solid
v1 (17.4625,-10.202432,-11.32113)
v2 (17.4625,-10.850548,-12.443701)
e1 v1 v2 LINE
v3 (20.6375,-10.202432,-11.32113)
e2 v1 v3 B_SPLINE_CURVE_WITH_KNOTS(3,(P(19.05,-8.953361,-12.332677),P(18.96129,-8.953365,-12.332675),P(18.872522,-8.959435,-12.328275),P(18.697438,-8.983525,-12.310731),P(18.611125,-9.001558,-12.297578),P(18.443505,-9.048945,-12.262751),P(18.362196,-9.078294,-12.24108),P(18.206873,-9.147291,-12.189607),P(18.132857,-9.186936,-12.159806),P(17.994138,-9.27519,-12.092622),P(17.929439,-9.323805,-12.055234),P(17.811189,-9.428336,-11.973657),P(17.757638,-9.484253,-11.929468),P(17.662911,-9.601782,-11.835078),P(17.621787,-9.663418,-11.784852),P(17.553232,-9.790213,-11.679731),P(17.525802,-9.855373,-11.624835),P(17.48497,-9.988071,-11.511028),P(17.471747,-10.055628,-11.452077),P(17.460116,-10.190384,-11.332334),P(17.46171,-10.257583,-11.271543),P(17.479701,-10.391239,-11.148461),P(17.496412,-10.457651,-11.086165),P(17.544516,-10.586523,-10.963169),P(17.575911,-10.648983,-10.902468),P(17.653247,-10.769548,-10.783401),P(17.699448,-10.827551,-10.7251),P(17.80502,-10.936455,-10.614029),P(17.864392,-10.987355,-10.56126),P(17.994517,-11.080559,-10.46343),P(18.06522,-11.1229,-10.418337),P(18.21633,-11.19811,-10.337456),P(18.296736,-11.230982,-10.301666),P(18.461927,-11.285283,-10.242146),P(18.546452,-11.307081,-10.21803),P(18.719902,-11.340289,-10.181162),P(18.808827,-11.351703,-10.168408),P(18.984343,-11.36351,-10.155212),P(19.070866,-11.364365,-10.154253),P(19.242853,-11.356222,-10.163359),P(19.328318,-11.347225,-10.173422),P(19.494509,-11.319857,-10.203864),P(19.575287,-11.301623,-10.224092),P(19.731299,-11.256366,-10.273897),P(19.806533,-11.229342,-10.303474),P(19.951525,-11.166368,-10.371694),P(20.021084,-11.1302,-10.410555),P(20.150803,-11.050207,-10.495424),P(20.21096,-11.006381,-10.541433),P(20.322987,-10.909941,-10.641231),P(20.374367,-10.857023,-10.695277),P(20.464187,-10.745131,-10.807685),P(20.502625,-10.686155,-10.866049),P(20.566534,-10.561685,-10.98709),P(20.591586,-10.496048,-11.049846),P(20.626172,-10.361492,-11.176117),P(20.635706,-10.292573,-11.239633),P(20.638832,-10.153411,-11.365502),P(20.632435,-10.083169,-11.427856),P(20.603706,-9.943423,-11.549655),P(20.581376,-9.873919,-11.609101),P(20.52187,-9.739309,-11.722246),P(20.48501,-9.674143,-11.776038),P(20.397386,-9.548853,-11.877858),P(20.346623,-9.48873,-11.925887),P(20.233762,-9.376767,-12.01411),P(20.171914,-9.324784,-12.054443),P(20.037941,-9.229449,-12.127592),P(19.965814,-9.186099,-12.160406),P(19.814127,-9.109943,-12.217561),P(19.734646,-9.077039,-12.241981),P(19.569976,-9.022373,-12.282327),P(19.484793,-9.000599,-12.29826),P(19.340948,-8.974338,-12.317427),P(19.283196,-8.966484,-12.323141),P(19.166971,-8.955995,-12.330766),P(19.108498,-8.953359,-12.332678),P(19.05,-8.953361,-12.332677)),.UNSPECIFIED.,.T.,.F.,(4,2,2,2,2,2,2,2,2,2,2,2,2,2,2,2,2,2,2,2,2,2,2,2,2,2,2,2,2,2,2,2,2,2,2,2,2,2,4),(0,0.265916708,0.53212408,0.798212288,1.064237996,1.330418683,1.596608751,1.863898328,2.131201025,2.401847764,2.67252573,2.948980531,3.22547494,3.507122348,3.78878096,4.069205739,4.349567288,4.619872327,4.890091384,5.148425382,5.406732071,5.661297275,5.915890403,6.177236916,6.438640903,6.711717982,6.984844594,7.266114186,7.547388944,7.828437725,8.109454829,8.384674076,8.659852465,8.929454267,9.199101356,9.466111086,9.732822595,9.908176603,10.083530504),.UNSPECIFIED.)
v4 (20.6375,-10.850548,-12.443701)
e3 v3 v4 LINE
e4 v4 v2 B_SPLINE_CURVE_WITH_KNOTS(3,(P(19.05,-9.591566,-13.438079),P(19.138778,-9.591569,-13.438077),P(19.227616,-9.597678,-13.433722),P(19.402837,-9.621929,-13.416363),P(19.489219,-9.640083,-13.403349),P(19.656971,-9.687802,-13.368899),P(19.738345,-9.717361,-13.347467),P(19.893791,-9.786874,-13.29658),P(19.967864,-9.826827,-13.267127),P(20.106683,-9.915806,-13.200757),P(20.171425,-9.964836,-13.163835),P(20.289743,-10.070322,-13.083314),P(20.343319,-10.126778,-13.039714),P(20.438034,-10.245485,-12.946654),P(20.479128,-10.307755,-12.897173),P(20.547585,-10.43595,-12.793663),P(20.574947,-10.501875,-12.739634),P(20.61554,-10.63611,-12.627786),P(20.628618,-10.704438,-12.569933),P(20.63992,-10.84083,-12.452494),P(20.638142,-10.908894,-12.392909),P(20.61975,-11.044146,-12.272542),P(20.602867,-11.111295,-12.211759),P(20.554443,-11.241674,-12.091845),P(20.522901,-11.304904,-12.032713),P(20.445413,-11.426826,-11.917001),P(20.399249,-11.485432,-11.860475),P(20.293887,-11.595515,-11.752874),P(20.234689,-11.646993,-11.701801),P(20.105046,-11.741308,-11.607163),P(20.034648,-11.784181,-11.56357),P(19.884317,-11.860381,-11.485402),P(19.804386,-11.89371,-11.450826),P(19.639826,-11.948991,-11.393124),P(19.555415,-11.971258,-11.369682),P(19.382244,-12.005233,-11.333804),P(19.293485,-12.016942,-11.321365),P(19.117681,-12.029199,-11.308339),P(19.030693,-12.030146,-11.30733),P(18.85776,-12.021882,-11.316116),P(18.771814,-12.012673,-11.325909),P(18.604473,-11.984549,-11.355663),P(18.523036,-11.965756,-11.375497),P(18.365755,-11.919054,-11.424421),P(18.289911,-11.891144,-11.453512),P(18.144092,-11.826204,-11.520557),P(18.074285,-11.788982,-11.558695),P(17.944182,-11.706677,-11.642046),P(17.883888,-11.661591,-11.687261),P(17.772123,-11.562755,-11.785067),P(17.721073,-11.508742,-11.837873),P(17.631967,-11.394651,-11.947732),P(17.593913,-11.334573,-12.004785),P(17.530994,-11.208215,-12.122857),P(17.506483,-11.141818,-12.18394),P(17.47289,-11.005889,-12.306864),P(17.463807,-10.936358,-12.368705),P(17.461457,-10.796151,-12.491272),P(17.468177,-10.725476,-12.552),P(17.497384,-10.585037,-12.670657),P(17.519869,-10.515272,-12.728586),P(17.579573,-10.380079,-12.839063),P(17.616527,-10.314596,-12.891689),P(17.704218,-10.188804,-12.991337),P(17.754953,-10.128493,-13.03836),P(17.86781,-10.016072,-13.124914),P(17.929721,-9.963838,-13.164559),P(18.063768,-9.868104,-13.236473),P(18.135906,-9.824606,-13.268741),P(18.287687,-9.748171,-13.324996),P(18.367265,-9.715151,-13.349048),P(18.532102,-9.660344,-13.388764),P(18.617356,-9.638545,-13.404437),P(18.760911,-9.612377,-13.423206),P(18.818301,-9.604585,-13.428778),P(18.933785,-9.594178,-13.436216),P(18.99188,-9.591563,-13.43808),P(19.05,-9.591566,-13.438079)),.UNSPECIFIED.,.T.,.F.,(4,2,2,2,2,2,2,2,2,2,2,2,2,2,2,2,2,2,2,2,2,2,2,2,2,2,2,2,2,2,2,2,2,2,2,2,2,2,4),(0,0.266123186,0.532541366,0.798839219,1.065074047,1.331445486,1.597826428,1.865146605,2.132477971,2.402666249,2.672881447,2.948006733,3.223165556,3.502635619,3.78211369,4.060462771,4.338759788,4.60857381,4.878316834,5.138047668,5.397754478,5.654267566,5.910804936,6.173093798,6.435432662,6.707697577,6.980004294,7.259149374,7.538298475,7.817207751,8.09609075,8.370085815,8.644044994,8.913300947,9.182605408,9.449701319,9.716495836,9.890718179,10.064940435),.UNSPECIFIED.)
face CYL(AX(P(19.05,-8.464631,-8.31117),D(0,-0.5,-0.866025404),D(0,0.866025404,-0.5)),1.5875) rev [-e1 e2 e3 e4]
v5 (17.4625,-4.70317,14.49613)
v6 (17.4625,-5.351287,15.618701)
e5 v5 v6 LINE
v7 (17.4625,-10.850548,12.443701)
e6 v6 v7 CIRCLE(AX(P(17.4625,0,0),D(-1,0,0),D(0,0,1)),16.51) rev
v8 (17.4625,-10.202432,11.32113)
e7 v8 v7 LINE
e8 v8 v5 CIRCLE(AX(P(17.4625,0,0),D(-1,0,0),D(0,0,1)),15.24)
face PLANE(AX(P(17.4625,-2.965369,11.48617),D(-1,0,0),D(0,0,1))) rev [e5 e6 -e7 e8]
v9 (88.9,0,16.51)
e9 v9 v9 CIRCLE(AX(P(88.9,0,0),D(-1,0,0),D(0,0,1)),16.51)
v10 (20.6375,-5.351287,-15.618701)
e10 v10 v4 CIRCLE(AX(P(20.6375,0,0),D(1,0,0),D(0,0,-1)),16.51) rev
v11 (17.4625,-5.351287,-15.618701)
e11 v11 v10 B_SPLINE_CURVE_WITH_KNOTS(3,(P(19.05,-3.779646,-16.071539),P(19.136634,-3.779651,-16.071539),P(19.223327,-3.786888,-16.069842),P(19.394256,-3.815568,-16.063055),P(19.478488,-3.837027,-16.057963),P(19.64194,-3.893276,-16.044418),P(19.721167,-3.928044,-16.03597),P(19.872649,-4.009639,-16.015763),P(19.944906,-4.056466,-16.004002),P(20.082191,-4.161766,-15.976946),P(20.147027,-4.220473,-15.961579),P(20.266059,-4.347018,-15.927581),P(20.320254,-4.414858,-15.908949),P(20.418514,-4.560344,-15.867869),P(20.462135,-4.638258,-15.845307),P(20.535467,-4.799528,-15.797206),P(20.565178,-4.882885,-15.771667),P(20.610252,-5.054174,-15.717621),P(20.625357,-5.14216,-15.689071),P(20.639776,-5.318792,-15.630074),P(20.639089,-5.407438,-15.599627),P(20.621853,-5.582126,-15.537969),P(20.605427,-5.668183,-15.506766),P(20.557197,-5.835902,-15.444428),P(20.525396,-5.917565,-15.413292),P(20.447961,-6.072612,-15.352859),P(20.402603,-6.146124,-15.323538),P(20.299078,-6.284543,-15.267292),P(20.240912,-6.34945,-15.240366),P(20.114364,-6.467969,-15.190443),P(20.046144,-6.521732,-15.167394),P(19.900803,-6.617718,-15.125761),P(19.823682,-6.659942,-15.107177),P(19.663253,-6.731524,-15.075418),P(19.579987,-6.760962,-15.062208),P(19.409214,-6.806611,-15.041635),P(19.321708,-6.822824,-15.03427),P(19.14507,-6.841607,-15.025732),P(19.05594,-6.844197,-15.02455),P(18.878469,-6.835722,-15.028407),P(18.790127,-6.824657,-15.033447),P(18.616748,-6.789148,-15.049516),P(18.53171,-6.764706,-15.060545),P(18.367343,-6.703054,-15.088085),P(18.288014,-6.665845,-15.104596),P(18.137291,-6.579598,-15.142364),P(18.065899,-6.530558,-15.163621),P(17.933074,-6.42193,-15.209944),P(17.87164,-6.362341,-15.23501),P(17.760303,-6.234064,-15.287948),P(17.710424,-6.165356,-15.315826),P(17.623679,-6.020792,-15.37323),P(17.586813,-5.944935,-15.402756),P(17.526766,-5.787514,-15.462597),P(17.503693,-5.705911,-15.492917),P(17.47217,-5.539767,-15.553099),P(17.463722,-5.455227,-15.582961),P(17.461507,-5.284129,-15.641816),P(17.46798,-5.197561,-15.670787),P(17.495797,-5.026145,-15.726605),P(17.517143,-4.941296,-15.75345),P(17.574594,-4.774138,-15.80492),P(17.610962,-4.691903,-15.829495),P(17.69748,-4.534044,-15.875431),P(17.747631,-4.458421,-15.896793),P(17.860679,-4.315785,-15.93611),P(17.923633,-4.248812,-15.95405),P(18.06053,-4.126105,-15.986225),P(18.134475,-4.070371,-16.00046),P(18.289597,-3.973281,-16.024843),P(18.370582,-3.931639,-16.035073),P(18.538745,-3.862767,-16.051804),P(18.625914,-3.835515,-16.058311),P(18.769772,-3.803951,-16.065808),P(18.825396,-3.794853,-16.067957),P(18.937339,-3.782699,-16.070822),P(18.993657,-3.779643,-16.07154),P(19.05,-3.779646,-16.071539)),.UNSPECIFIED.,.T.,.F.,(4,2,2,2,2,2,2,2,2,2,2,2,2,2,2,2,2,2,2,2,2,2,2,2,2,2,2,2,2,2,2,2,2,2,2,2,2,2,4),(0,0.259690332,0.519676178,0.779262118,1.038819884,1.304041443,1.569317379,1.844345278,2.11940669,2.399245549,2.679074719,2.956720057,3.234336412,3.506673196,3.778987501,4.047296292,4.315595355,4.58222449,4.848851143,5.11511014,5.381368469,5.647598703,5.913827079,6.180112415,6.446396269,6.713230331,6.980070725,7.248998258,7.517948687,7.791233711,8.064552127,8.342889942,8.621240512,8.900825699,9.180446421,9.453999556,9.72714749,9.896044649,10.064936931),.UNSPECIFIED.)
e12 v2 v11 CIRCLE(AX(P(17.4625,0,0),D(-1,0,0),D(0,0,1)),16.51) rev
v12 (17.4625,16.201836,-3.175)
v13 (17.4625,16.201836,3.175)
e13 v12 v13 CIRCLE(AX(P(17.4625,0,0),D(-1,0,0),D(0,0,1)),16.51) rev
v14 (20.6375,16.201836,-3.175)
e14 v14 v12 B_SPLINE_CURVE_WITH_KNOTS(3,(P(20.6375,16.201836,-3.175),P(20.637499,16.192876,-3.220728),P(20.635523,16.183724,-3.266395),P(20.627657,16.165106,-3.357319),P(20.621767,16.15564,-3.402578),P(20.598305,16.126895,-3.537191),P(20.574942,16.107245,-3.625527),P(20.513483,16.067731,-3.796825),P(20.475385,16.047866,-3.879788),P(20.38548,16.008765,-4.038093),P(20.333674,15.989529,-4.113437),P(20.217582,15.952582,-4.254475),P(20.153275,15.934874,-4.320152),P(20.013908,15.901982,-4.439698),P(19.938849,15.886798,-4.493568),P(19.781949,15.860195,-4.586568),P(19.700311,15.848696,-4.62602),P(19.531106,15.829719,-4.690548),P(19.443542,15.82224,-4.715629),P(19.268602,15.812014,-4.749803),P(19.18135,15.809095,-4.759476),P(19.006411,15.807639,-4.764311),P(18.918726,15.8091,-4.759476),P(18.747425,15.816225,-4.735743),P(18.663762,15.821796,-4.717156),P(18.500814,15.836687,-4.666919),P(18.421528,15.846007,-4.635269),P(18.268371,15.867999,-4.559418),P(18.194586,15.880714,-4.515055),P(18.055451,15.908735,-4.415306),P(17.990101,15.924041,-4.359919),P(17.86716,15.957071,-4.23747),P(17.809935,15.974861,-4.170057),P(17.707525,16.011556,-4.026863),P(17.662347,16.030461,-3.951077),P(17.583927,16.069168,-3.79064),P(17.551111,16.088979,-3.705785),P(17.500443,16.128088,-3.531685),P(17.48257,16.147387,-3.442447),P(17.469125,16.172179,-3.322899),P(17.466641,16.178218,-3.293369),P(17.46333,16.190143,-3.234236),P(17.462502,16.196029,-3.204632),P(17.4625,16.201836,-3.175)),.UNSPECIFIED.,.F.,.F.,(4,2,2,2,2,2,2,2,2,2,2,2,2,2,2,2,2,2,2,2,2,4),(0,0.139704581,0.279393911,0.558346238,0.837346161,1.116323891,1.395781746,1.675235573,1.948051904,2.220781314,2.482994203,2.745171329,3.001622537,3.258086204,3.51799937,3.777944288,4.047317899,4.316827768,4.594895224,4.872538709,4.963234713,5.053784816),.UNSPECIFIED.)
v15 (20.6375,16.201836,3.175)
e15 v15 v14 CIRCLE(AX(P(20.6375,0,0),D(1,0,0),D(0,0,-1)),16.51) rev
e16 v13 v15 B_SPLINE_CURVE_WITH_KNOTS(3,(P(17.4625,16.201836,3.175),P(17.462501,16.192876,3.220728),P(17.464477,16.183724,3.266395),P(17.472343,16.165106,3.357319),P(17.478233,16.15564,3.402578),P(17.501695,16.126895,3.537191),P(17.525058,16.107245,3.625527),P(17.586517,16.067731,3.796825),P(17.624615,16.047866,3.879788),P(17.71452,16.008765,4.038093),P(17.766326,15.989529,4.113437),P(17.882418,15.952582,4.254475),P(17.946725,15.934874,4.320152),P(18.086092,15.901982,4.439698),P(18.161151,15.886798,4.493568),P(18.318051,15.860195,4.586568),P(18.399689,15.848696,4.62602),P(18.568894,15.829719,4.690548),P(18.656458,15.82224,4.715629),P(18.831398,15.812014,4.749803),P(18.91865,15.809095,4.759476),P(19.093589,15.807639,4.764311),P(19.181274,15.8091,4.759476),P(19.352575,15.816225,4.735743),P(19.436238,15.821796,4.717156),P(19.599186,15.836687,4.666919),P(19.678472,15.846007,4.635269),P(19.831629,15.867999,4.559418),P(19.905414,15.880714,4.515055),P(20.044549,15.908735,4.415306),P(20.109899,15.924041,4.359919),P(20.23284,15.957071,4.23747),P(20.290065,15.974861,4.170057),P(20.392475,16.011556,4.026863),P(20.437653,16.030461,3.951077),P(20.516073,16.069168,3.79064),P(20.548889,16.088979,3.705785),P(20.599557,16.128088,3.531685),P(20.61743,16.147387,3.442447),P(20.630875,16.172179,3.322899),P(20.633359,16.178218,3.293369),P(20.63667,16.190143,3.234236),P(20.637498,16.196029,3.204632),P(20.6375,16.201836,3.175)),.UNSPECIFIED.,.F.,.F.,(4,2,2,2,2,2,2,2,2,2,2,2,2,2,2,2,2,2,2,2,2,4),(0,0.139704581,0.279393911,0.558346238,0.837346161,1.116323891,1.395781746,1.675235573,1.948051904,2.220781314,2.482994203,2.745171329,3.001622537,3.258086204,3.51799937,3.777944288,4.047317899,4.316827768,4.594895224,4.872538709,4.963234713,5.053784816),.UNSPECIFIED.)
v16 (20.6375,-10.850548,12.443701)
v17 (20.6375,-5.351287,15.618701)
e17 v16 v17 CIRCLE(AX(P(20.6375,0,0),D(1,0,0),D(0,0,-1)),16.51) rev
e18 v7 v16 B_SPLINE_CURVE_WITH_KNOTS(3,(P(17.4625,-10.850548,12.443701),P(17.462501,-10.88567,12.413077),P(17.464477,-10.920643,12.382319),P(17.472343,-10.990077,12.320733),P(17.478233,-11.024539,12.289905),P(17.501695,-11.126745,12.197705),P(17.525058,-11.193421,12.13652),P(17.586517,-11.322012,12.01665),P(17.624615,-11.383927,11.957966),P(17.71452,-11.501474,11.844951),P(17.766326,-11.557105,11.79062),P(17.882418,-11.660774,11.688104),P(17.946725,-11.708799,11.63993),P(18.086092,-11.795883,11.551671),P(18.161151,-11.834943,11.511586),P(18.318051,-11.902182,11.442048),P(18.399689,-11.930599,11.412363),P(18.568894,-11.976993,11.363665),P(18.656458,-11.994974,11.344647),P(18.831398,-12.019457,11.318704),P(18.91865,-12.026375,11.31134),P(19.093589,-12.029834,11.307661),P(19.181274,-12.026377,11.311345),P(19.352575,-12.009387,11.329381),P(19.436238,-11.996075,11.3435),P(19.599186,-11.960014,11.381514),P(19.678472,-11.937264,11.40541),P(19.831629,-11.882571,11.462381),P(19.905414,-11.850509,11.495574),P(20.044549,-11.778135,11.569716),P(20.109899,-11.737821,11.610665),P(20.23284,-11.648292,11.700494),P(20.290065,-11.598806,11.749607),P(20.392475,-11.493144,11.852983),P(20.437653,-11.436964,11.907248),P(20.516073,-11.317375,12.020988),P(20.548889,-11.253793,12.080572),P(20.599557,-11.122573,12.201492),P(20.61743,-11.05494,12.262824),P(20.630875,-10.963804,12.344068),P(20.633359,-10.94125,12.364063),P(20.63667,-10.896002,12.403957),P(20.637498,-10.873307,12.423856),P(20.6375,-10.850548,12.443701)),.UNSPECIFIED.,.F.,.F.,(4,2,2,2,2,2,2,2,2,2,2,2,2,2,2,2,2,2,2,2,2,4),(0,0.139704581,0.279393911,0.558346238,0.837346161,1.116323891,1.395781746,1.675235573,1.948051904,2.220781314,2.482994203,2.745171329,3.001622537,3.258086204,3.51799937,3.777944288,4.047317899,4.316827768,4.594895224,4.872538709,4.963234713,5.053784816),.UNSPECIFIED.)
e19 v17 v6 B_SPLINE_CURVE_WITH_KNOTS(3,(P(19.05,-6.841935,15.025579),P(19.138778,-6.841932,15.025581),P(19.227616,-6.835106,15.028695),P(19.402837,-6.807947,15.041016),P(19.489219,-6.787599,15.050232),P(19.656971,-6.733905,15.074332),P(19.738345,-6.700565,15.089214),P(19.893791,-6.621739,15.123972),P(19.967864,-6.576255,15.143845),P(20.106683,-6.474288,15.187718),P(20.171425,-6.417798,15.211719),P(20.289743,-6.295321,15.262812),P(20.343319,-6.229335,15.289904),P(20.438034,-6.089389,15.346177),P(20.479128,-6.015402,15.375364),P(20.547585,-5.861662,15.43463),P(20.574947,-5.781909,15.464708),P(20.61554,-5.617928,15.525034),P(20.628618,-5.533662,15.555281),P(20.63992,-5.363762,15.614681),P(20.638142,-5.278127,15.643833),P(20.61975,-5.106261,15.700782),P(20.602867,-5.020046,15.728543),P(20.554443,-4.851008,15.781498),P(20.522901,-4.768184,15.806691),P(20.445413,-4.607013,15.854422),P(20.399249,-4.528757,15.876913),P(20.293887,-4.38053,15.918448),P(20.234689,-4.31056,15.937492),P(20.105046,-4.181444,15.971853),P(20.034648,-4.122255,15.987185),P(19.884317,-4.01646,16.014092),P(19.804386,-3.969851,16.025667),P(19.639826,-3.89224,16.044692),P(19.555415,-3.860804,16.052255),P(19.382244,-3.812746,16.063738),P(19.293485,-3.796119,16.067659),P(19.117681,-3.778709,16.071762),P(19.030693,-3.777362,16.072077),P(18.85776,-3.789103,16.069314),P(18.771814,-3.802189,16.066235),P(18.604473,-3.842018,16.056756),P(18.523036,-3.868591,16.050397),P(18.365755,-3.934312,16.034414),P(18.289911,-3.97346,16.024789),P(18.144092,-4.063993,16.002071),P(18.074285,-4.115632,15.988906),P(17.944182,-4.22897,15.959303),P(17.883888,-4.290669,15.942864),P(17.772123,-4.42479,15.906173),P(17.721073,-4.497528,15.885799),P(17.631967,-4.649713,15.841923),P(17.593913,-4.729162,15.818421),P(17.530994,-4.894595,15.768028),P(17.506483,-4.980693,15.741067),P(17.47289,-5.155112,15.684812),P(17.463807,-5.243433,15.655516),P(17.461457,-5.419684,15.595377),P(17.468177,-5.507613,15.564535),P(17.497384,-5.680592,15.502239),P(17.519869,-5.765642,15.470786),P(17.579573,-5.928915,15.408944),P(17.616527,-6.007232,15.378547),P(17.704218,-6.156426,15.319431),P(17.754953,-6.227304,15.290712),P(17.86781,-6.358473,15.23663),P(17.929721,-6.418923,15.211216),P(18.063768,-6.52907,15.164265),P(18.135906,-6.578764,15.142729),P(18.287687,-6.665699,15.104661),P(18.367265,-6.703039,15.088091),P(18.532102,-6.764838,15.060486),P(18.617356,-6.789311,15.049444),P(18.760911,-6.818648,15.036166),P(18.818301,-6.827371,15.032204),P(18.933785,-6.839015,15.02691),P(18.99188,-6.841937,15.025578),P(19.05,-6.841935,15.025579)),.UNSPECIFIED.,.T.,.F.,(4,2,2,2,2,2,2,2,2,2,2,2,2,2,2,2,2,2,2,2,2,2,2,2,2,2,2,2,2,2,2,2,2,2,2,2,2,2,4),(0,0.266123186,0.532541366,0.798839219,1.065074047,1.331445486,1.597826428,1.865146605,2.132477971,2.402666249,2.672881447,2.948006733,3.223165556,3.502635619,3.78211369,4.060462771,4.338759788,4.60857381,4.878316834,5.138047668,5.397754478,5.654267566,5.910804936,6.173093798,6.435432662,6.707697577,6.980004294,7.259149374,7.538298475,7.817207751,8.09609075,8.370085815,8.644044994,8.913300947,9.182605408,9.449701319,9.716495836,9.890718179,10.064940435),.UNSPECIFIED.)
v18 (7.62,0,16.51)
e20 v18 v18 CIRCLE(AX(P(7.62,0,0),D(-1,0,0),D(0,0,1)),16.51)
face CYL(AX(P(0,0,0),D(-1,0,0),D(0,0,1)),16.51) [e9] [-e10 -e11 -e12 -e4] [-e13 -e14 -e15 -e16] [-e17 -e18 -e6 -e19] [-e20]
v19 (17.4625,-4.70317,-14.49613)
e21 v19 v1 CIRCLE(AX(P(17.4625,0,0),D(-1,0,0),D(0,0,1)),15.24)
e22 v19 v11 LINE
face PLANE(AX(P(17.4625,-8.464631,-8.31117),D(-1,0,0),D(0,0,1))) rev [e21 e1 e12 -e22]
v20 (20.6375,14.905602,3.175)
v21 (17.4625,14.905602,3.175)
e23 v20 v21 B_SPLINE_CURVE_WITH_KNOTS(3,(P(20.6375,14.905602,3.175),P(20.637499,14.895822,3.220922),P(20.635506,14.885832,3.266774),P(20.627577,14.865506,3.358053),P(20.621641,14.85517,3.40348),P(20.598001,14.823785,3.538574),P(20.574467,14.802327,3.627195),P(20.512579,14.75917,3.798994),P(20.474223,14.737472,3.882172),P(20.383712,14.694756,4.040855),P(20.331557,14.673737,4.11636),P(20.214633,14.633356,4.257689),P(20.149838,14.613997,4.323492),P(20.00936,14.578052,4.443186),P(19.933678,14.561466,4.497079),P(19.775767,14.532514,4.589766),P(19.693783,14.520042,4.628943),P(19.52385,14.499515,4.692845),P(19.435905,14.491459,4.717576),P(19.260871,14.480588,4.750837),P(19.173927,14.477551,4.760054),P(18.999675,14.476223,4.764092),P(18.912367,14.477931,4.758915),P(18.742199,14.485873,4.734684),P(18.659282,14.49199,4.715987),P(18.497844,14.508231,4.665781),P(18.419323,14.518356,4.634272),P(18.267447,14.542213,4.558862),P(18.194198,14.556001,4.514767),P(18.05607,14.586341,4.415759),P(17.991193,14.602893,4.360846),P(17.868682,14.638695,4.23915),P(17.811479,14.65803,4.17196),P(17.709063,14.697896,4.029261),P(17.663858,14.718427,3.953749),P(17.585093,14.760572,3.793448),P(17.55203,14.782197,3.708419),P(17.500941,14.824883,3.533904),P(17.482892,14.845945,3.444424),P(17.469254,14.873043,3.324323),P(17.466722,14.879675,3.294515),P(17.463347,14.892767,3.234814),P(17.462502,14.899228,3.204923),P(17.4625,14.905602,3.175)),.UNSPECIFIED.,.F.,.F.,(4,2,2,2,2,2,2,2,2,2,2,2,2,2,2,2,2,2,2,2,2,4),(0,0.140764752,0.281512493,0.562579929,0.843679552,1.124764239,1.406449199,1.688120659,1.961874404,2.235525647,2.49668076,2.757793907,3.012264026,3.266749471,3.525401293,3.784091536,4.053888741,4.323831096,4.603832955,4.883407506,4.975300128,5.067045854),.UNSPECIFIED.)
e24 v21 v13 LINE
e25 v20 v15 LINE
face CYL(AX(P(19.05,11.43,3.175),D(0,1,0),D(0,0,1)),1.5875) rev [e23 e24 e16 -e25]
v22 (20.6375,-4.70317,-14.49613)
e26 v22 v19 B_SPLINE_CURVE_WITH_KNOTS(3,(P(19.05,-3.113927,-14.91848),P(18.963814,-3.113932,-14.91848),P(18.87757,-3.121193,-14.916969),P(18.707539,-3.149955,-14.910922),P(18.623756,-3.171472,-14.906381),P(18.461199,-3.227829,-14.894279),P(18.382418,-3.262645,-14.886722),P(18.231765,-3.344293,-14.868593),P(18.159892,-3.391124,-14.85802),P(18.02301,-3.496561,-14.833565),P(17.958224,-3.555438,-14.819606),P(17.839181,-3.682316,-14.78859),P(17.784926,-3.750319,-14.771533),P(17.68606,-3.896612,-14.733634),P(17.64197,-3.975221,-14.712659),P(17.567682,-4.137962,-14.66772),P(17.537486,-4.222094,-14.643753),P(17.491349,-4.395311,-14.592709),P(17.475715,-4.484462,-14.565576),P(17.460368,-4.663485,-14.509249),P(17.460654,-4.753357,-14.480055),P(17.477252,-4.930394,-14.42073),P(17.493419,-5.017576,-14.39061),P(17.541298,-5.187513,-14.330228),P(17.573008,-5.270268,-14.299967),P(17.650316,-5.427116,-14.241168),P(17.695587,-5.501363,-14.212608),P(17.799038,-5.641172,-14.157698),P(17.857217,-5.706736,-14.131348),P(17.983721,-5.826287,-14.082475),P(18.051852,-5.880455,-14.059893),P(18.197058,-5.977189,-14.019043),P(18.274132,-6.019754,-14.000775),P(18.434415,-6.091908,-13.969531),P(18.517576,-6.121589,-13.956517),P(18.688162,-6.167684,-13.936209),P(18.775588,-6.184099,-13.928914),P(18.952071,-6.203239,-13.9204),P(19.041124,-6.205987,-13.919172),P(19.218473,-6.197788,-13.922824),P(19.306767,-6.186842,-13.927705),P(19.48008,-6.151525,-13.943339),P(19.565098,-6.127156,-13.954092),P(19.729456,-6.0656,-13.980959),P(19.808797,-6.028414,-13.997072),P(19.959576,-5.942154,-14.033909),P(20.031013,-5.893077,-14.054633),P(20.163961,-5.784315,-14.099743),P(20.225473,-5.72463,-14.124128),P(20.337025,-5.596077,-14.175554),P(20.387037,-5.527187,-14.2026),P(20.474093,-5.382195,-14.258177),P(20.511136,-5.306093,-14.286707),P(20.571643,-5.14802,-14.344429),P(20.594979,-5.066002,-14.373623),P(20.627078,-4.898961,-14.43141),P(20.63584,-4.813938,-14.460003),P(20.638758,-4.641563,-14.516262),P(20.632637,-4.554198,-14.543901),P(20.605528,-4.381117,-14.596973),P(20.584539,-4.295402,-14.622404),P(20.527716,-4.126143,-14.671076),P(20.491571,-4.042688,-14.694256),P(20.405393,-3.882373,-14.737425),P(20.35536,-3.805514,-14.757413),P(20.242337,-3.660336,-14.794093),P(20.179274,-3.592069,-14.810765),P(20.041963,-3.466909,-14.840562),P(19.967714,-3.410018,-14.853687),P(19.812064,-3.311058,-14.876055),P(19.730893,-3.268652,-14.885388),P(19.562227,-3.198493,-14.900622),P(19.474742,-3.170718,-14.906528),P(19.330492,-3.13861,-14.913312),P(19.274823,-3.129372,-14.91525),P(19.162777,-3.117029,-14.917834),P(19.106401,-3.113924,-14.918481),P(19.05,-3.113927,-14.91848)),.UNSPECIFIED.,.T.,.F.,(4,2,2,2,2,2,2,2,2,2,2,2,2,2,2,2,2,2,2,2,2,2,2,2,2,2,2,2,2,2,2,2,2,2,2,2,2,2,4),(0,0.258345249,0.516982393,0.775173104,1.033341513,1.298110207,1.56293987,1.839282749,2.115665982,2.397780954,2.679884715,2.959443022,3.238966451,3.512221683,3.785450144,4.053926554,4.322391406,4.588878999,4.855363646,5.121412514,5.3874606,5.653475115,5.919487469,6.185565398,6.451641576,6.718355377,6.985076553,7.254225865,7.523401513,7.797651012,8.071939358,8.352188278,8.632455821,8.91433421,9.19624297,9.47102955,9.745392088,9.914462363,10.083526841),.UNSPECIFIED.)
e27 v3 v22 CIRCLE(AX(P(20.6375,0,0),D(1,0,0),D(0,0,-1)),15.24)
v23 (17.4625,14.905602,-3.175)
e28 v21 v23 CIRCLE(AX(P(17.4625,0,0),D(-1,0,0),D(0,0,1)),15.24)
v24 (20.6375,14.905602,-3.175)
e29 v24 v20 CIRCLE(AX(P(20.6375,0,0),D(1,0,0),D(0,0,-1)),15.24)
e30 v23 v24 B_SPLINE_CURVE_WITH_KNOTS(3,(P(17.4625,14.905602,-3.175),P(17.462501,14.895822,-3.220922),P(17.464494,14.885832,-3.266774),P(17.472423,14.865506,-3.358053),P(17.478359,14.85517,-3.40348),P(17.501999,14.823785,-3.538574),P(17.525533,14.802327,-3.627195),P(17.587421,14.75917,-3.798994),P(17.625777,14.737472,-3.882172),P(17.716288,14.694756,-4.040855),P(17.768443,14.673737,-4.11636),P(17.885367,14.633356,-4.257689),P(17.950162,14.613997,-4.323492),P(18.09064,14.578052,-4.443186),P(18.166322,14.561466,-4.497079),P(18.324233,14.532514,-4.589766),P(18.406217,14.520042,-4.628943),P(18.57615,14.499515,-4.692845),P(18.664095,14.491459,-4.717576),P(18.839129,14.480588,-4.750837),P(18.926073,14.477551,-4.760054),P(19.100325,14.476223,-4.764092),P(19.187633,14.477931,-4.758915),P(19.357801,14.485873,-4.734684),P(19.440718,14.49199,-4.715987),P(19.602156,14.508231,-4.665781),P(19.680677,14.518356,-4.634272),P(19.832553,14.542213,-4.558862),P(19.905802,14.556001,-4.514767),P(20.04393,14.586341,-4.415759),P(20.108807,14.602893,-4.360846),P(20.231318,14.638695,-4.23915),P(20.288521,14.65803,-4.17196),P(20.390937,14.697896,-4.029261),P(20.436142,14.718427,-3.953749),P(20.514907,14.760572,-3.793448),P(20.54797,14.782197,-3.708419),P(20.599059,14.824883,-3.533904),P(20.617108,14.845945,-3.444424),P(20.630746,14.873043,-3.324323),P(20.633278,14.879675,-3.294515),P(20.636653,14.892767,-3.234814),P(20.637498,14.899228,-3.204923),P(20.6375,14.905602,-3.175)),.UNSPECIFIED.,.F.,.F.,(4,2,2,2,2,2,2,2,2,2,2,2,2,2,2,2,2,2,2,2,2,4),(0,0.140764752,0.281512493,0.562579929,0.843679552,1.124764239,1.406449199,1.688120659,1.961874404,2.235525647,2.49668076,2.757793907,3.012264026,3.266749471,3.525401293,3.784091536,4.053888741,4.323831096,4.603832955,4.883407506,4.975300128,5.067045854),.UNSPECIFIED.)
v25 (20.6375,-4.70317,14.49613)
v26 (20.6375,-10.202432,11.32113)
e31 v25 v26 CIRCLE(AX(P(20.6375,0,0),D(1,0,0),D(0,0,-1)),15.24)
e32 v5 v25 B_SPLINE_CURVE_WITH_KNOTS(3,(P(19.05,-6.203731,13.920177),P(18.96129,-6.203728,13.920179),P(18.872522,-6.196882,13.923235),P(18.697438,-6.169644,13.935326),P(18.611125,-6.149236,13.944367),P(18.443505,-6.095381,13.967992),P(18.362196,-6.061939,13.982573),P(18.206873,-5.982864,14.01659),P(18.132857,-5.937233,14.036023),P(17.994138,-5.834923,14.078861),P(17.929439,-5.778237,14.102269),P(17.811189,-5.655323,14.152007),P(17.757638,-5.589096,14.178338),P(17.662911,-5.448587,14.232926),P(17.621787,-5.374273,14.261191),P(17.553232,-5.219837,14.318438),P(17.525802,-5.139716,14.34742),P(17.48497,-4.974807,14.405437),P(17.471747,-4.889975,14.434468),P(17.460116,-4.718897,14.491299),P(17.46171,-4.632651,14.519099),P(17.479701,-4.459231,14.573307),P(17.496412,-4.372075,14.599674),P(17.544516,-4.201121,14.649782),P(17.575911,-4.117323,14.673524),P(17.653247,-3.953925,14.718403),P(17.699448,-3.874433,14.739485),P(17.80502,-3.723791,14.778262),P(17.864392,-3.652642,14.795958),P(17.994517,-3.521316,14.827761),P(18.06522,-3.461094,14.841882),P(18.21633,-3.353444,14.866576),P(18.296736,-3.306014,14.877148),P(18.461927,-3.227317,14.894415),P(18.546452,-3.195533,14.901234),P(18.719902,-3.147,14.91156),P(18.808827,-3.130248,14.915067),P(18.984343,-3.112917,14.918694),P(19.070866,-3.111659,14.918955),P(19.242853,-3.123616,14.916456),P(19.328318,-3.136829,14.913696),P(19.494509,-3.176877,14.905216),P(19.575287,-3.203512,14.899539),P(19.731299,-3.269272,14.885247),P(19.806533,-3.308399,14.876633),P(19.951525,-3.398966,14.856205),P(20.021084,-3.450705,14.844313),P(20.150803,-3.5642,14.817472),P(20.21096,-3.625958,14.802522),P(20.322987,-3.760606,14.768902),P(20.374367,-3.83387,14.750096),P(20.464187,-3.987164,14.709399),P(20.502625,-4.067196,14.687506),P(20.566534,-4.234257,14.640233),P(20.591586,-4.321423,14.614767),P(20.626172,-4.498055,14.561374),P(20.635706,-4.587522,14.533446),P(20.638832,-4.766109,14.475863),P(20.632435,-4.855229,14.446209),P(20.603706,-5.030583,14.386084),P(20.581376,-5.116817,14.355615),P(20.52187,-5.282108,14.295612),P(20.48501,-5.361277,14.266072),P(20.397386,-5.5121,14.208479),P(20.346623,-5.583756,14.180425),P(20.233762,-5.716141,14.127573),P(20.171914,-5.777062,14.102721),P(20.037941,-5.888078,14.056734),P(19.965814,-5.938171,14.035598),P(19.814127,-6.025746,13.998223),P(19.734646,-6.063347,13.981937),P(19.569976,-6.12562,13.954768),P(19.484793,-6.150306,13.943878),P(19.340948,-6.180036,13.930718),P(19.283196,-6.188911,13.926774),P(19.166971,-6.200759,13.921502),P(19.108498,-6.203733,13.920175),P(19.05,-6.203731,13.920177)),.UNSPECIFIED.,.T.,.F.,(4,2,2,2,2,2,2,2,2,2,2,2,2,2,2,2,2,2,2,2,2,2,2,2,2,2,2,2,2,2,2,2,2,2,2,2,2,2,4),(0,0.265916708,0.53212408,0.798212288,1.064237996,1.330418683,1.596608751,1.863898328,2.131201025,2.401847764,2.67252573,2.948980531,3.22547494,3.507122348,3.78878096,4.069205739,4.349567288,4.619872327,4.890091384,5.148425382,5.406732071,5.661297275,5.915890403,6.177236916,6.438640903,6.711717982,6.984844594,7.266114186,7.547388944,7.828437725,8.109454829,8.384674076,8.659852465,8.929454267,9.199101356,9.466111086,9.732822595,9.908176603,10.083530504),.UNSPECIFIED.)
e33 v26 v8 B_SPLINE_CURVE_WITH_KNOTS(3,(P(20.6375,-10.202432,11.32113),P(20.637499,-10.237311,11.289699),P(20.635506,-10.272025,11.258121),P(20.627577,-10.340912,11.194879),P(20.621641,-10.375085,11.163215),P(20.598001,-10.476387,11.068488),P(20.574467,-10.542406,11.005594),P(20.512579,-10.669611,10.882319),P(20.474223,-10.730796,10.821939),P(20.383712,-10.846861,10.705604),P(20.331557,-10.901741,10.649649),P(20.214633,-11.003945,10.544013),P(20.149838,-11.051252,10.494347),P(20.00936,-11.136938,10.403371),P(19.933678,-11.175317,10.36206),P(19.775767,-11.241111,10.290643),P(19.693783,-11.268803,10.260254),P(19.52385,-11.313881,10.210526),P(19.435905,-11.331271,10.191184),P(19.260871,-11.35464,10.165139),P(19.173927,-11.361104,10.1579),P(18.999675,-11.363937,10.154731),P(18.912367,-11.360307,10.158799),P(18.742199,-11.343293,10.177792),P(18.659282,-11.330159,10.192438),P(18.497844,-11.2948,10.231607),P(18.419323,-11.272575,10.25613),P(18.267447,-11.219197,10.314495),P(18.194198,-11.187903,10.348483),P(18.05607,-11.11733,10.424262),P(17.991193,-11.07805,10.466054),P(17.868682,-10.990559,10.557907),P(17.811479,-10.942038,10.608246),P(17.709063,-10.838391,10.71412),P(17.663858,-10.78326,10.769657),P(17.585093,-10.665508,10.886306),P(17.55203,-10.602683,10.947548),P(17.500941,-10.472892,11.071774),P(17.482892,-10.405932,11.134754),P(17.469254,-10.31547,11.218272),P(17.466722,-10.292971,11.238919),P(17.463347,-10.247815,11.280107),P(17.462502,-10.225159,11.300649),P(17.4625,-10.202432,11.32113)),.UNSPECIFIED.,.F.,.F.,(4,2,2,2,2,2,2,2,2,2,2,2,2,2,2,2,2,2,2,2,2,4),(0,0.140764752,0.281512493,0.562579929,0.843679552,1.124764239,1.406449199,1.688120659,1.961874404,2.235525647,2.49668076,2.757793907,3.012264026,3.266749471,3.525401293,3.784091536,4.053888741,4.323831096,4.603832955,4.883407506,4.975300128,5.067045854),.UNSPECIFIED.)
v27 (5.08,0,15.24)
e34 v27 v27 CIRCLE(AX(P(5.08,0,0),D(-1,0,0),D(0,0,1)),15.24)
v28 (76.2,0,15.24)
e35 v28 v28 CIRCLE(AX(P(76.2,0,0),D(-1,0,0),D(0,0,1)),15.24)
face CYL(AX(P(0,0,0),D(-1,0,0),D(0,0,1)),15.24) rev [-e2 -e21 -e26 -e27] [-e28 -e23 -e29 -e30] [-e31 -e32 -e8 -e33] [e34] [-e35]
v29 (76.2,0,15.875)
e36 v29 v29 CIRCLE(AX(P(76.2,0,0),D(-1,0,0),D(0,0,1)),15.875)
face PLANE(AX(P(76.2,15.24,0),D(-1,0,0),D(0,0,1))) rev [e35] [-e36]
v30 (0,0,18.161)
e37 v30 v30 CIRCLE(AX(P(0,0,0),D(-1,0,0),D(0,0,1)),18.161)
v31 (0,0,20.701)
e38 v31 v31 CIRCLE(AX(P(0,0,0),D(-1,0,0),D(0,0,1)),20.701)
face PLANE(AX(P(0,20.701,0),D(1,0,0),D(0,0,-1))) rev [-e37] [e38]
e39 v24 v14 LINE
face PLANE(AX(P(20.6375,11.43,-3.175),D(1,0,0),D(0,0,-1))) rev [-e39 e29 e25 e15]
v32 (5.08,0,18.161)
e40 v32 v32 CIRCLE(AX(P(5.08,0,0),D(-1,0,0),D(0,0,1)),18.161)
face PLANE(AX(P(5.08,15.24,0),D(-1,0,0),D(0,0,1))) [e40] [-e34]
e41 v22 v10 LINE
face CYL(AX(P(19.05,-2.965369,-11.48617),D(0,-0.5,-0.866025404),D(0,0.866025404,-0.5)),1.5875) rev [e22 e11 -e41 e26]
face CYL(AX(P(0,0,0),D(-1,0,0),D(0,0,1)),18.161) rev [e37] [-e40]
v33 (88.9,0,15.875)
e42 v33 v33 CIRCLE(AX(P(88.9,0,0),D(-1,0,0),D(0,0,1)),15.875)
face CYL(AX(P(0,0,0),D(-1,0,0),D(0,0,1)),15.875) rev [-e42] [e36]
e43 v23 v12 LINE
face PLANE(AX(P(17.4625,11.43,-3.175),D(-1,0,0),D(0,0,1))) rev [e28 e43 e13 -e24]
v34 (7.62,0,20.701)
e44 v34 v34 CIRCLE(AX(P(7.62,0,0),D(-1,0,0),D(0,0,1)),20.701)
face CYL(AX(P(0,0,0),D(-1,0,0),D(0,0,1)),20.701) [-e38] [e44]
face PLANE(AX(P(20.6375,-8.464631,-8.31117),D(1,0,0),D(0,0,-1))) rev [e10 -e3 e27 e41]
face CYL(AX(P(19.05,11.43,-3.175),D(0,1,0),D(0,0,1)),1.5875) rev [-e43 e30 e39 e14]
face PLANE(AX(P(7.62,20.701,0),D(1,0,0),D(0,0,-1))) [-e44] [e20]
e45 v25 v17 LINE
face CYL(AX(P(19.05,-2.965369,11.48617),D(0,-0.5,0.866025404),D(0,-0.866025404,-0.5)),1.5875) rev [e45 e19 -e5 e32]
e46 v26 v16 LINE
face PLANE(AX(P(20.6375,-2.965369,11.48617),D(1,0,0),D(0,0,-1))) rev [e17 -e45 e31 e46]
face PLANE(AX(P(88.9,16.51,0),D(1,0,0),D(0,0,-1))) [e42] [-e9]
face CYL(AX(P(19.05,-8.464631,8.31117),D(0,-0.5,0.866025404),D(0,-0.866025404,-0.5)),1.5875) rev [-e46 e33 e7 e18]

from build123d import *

# Parameters (mm, degrees)
CUT_EXTRUDE1_DEPTH = 5.08
CIRPATTERN1_COUNT  = 3


# Read off the part's stored shape, not the designer's step: Revolve1
with BuildPart() as part:
    # Revolve1 outline → Revolve1 (revolve)
    with BuildSketch(Plane.YX):
        Polygon((20.701, 0), (20.701, 7.62), (16.51, 7.62), (16.51, 88.9), (15.875, 88.9), (15.875, 76.2), (15.24, 76.2), (15.24, 5.08), (18.161, 5.08), (18.161, 0), align=None)
    revolve(axis=Axis((0, 0, 0), (1, 0, 0)))

    # Sketch2 → Cut-Extrude1 (cut)
    with BuildSketch(Plane(origin=(0, 16.51, 0), x_dir=(1, 0, 0), z_dir=(0, 1, 0))):
        with BuildLine():
            Line((20.6375, 3.175), (20.6375, -3.175))
            ThreePointArc((20.6375, -3.175), (19.05, -4.7625), (17.4625, -3.175))
            Line((17.4625, -3.175), (17.4625, 3.175))
            ThreePointArc((17.4625, 3.175), (19.05, 4.7625), (20.6375, 3.175))
        make_face()
    cut_extrude1 = extrude(amount=-CUT_EXTRUDE1_DEPTH, mode=Mode.SUBTRACT)

    # CirPattern1: Cut-Extrude1 ×3 about axis
    cirpattern1_axis = Axis((0, 0, 0), (1, 0, 0))
    for i in range(1, CIRPATTERN1_COUNT):
        add(cut_extrude1.rotate(cirpattern1_axis, i * 360 / CIRPATTERN1_COUNT), mode=Mode.SUBTRACT)


solid = part.part
